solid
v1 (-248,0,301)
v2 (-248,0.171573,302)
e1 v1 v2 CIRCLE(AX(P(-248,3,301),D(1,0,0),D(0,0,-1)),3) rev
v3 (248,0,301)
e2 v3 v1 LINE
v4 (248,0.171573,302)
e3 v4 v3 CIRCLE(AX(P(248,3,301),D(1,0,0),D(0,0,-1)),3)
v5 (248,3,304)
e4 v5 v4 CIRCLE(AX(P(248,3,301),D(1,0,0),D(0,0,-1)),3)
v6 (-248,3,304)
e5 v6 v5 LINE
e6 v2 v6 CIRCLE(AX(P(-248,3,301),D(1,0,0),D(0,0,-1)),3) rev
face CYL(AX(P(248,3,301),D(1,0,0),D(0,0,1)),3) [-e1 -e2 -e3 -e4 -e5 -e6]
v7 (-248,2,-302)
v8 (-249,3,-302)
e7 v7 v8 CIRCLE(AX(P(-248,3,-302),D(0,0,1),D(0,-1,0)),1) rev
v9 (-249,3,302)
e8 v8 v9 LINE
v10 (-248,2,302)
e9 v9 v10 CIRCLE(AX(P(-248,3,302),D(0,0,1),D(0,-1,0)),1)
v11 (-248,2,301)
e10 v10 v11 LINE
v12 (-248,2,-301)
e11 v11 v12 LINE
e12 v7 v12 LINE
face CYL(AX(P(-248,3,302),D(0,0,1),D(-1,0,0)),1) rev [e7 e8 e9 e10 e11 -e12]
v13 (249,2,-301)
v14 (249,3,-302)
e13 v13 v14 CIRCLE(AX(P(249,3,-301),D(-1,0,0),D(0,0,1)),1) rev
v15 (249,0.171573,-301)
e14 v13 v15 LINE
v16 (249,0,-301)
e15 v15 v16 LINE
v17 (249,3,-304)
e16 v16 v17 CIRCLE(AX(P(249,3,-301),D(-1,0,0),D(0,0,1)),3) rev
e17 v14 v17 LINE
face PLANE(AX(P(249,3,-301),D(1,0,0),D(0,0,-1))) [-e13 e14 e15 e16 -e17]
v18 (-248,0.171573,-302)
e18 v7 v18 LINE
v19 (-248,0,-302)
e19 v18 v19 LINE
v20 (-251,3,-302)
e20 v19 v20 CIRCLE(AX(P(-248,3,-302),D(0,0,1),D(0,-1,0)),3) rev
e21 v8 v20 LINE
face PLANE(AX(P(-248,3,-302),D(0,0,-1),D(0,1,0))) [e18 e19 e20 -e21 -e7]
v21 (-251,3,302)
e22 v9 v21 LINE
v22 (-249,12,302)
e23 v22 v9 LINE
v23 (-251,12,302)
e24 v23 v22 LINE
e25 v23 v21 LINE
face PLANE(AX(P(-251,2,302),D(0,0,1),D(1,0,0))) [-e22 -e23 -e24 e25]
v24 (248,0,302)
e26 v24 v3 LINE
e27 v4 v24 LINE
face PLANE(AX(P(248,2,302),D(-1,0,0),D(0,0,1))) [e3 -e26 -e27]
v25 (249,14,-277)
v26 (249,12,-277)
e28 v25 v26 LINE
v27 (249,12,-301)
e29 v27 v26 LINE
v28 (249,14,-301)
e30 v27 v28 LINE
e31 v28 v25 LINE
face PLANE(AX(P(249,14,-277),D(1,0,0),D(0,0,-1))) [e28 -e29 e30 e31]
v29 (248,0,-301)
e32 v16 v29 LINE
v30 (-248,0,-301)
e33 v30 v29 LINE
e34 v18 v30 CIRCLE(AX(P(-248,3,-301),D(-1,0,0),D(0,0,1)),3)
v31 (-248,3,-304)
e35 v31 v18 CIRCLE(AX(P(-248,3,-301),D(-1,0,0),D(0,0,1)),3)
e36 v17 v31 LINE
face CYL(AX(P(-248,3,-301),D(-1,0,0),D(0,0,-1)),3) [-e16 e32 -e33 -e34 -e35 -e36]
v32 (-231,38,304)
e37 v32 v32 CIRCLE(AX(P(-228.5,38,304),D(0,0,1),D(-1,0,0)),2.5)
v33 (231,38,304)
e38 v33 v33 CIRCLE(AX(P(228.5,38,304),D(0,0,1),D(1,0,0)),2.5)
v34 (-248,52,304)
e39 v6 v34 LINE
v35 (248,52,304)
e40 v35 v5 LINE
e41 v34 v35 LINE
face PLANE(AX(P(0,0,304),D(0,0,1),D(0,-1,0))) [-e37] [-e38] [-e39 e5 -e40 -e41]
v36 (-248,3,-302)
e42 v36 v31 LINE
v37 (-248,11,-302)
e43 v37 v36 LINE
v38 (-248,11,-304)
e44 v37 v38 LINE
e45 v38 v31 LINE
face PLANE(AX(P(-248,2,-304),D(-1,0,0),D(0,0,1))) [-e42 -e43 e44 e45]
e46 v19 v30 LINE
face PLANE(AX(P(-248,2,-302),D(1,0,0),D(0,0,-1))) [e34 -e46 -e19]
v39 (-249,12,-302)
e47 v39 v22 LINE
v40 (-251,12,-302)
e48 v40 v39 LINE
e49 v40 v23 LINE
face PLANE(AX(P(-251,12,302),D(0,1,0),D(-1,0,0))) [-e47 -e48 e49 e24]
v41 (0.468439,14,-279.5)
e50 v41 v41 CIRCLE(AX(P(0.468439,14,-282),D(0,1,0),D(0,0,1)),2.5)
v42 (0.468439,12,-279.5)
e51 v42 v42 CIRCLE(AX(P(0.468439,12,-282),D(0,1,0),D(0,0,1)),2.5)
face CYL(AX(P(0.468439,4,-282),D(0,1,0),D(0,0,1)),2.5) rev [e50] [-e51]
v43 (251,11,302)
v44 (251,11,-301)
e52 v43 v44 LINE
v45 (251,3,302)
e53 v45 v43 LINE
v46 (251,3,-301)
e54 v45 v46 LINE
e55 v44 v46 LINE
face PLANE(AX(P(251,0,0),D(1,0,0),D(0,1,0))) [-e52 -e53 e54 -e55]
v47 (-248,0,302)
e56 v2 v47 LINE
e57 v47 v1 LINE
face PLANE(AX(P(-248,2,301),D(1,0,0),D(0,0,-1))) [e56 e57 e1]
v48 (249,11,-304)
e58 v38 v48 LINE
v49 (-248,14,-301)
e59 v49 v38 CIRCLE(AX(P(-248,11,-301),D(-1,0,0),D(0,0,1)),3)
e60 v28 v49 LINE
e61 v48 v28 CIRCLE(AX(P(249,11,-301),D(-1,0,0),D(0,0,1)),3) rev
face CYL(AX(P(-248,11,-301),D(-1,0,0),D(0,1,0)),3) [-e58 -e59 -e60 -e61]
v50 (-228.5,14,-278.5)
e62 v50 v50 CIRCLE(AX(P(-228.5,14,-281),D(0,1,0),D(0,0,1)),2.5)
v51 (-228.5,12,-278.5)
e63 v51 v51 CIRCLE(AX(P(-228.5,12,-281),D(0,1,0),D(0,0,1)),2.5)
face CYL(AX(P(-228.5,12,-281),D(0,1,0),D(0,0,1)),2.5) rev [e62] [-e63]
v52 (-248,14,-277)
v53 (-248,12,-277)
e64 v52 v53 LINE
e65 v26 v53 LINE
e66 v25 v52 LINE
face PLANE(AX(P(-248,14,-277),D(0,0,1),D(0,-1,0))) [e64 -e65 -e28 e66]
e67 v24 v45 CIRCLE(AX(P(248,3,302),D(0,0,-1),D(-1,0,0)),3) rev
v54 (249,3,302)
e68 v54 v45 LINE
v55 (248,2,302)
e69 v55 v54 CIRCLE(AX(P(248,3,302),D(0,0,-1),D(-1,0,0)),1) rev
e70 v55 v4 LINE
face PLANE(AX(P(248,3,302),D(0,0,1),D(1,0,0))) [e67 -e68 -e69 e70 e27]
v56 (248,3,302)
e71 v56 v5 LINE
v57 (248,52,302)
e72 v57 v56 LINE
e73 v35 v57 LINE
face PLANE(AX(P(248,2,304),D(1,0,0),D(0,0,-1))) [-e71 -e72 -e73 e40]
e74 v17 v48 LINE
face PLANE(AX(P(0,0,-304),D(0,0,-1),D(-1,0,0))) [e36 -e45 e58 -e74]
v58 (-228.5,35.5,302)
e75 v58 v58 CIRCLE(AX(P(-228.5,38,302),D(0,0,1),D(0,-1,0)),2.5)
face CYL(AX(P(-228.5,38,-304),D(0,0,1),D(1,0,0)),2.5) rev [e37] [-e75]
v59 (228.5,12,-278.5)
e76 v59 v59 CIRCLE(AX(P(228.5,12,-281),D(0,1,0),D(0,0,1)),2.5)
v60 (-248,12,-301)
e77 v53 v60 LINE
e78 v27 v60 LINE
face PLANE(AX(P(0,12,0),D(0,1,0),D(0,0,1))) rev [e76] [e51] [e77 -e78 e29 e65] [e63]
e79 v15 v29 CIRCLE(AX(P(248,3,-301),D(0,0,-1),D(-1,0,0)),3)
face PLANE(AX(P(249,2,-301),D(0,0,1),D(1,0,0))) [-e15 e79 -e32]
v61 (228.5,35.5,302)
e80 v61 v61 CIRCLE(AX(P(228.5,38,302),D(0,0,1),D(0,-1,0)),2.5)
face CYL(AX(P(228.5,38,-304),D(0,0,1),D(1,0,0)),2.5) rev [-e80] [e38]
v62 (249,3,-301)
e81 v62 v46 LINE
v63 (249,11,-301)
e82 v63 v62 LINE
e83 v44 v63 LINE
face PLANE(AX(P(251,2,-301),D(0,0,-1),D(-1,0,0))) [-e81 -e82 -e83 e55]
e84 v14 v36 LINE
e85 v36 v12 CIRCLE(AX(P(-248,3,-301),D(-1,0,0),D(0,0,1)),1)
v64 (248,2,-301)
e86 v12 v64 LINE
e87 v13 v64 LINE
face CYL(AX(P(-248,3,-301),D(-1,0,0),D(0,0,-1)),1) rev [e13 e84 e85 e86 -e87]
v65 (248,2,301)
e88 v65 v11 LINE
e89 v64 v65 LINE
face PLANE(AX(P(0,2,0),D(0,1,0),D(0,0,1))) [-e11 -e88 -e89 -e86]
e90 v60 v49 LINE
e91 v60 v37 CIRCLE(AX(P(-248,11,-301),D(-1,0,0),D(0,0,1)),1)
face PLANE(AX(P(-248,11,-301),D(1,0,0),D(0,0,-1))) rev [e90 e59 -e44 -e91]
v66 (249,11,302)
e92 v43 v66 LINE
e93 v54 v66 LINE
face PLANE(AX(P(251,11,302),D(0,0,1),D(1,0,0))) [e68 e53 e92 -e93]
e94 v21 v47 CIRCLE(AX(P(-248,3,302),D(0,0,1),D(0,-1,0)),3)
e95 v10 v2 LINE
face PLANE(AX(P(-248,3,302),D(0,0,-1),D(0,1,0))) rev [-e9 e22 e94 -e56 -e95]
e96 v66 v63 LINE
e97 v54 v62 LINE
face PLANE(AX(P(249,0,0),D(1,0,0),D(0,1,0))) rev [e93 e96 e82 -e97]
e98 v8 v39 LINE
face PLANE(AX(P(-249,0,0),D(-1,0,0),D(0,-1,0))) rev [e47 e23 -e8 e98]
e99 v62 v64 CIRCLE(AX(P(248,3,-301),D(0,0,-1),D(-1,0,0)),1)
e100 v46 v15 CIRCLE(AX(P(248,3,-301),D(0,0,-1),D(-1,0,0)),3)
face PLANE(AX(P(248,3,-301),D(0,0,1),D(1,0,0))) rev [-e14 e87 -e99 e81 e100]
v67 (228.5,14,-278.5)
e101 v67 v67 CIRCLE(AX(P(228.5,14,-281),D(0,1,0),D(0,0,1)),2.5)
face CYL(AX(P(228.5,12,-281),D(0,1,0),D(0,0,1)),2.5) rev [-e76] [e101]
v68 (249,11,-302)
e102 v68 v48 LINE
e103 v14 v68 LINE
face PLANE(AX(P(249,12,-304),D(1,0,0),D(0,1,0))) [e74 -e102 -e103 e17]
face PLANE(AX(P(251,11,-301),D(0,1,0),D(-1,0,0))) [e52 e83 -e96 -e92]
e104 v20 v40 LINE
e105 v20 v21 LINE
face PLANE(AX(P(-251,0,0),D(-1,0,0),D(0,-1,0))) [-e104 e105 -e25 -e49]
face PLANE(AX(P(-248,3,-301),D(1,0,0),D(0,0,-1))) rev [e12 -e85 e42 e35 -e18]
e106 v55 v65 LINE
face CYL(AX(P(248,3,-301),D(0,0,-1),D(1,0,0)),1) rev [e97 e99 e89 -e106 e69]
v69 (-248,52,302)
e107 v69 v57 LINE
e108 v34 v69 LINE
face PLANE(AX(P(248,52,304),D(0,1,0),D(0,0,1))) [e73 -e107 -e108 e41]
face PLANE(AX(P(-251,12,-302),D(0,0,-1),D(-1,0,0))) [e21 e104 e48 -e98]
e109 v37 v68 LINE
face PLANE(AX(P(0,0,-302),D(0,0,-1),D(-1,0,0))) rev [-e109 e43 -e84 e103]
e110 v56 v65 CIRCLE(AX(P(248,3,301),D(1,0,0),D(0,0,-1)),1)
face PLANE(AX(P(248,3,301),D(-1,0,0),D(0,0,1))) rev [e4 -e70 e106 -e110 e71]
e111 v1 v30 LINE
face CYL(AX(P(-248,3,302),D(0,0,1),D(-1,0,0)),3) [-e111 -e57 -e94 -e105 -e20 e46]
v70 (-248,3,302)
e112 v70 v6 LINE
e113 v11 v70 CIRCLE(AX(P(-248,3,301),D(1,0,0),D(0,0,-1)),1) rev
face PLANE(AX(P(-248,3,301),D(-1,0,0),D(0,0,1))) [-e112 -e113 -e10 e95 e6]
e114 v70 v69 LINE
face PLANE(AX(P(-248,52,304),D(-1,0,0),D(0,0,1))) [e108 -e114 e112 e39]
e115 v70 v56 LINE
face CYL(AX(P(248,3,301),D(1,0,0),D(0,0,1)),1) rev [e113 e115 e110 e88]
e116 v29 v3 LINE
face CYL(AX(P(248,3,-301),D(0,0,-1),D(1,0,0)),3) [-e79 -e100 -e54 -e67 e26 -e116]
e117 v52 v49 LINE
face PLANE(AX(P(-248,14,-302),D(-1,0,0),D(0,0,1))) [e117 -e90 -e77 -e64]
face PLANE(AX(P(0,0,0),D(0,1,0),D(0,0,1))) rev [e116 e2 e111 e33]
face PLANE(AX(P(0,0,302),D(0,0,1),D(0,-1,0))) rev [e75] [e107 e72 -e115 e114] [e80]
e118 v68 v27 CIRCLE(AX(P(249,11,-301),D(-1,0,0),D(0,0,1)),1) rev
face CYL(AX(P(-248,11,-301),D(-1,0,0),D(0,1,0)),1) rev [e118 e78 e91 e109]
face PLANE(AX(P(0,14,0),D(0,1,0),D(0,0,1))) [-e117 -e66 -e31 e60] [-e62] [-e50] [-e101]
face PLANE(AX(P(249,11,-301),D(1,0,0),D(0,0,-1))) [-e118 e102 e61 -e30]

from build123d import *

# Parameters (mm, degrees)
SKETCH1_W                    = 498
SKETCH1_H                    = 604
BASE_FLANGE1_DEPTH           = 2
EDGE_FLANGE1_STRIP_W         = 10
EDGE_FLANGE1_STRIP_H         = 2
EDGE_FLANGE1_STRIP_CUT_DEPTH = 604
EDGE_FLANGE1_DEPTH           = 604
EDGE_FLANGE4_STRIP_W         = 10
EDGE_FLANGE4_STRIP_H         = 2
EDGE_FLANGE4_STRIP_CUT_DEPTH = 497
EDGE_FLANGE4_DEPTH           = 497
EDGE_FLANGE5_STRIP_W         = 10
EDGE_FLANGE5_STRIP_H         = 2
EDGE_FLANGE5_STRIP_CUT_DEPTH = 497
EDGE_FLANGE5_DEPTH           = 497
EDGE_FLANGE6_STRIP_W         = 10
EDGE_FLANGE6_STRIP_H         = 2
EDGE_FLANGE6_STRIP_CUT_DEPTH = 603
EDGE_FLANGE6_DEPTH           = 603
EDGE_FLANGE7_STRIP_W         = 10
EDGE_FLANGE7_STRIP_H         = 2
EDGE_FLANGE7_STRIP_CUT_DEPTH = 496
EDGE_FLANGE7_DEPTH           = 496
SKETCH37_R                   = 2.5
CUT_EXTRUDE2_DEPTH           = 2
SKETCH38_R                   = 2.5
CUT_EXTRUDE3_DEPTH           = 660.824976793
SKETCH39_R                   = 2.5
CUT_EXTRUDE4_DEPTH           = 10


# Sheet-metal steps are written as plain solids
with BuildPart() as part:
    # Sketch1 → Base-Flange1 (new body)
    with BuildSketch(Plane(origin=(0, 0, 0), x_dir=(1, 0, 0), z_dir=(0, 1, 0))):
        Rectangle(SKETCH1_W, SKETCH1_H)
    extrude(amount=BASE_FLANGE1_DEPTH)

    # Edge-Flange1 strip (across the edge) → Edge-Flange1 strip cut (cut)
    with BuildSketch(Plane(origin=(-249, 2, -302), x_dir=(1, 0, 0), z_dir=(0, 0, 1))):
        with Locations((-4, -1)):
            Rectangle(EDGE_FLANGE1_STRIP_W, EDGE_FLANGE1_STRIP_H)
    extrude(amount=EDGE_FLANGE1_STRIP_CUT_DEPTH, mode=Mode.SUBTRACT)

    # Edge-Flange1 section (across the edge) → Edge-Flange1 (add)
    with BuildSketch(Plane(origin=(-249, 2, -302), x_dir=(1, 0, 0), z_dir=(0, 0, 1))):
        with BuildLine():
            Line((-2, 1), (-2, 10))
            Line((-2, 10), (0, 10))
            Line((0, 10), (0, 1))
            ThreePointArc((0, 1), (0.292893219, 0.292893219), (1, 0))
            Line((1, 0), (1, -2))
            ThreePointArc((1, -2), (-1.121320344, -1.121320344), (-2, 1))
        make_face()
    extrude(amount=EDGE_FLANGE1_DEPTH)

    # Edge-Flange4 strip (across the edge) → Edge-Flange4 strip cut (cut)
    with BuildSketch(Plane(origin=(249, 2, -302), x_dir=(0, 0, 1), z_dir=(-1, 0, 0))):
        with Locations((-4, -1)):
            Rectangle(EDGE_FLANGE4_STRIP_W, EDGE_FLANGE4_STRIP_H)
    extrude(amount=EDGE_FLANGE4_STRIP_CUT_DEPTH, mode=Mode.SUBTRACT)

    # Edge-Flange4 section (across the edge) → Edge-Flange4 (add)
    with BuildSketch(Plane(origin=(249, 2, -302), x_dir=(0, 0, 1), z_dir=(-1, 0, 0))):
        with BuildLine():
            Line((-2, 1), (-2, 10))
            Line((-2, 10), (0, 10))
            Line((0, 10), (0, 1))
            ThreePointArc((0, 1), (0.292893219, 0.292893219), (1, 0))
            Line((1, 0), (1, -2))
            ThreePointArc((1, -2), (-1.121320344, -1.121320344), (-2, 1))
        make_face()
    extrude(amount=EDGE_FLANGE4_DEPTH)

    # Edge-Flange5 strip (across the edge) → Edge-Flange5 strip cut (cut)
    with BuildSketch(Plane(origin=(249, 12, -302), x_dir=(0, -1, 0), z_dir=(-1, 0, 0))):
        with Locations((-4, -1)):
            Rectangle(EDGE_FLANGE5_STRIP_W, EDGE_FLANGE5_STRIP_H)
    extrude(amount=EDGE_FLANGE5_STRIP_CUT_DEPTH, mode=Mode.SUBTRACT)

    # Edge-Flange5 section (across the edge) → Edge-Flange5 (add)
    with BuildSketch(Plane(origin=(249, 12, -302), x_dir=(0, -1, 0), z_dir=(-1, 0, 0))):
        with BuildLine():
            Line((-2, 1), (-2, 25))
            Line((-2, 25), (0, 25))
            Line((0, 25), (0, 1))
            ThreePointArc((0, 1), (0.292893219, 0.292893219), (1, 0))
            Line((1, 0), (1, -2))
            ThreePointArc((1, -2), (-1.121320344, -1.121320344), (-2, 1))
        make_face()
    extrude(amount=EDGE_FLANGE5_DEPTH)

    # Edge-Flange6 strip (across the edge) → Edge-Flange6 strip cut (cut)
    with BuildSketch(Plane(origin=(249, 2, 302), x_dir=(-1, 0, 0), z_dir=(0, 0, -1))):
        with Locations((-4, -1)):
            Rectangle(EDGE_FLANGE6_STRIP_W, EDGE_FLANGE6_STRIP_H)
    extrude(amount=EDGE_FLANGE6_STRIP_CUT_DEPTH, mode=Mode.SUBTRACT)

    # Edge-Flange6 section (across the edge) → Edge-Flange6 (add)
    with BuildSketch(Plane(origin=(249, 2, 302), x_dir=(-1, 0, 0), z_dir=(0, 0, -1))):
        with BuildLine():
            Line((-2, 1), (-2, 9))
            Line((-2, 9), (0, 9))
            Line((0, 9), (0, 1))
            ThreePointArc((0, 1), (0.292893219, 0.292893219), (1, 0))
            Line((1, 0), (1, -2))
            ThreePointArc((1, -2), (-1.121320344, -1.121320344), (-2, 1))
        make_face()
    extrude(amount=EDGE_FLANGE6_DEPTH)

    # Edge-Flange7 strip (across the edge) → Edge-Flange7 strip cut (cut)
    with BuildSketch(Plane(origin=(-248, 2, 302), x_dir=(0, 0, -1), z_dir=(1, 0, 0))):
        with Locations((-4, -1)):
            Rectangle(EDGE_FLANGE7_STRIP_W, EDGE_FLANGE7_STRIP_H)
    extrude(amount=EDGE_FLANGE7_STRIP_CUT_DEPTH, mode=Mode.SUBTRACT)

    # Edge-Flange7 section (across the edge) → Edge-Flange7 (add)
    with BuildSketch(Plane(origin=(-248, 2, 302), x_dir=(0, 0, -1), z_dir=(1, 0, 0))):
        with BuildLine():
            Line((-2, 1), (-2, 50))
            Line((-2, 50), (0, 50))
            Line((0, 50), (0, 1))
            ThreePointArc((0, 1), (0.292893219, 0.292893219), (1, 0))
            Line((1, 0), (1, -2))
            ThreePointArc((1, -2), (-1.121320344, -1.121320344), (-2, 1))
        make_face()
    extrude(amount=EDGE_FLANGE7_DEPTH)

    # Sketch37 → Cut-Extrude2 (cut)
    with BuildSketch(Plane(origin=(0, 14, 0), x_dir=(1, 0, 0), z_dir=(0, 1, 0))):
        with Locations(Location((-228.5, 281, 0), (0, 0, 270))):
            Circle(SKETCH37_R)
        with Locations(Location((228.5, 281, 0), (0, 0, 270))):
            Circle(SKETCH37_R)
    extrude(amount=-CUT_EXTRUDE2_DEPTH, mode=Mode.SUBTRACT)

    # Sketch38 → Cut-Extrude3 (cut, through all)
    with BuildSketch(Plane.XY.offset(304)):
        with Locations((228.5, 38)):
            Circle(SKETCH38_R)
        with Locations(Location((-228.5, 38, 0), (0, 0, 270))):
            Circle(SKETCH38_R)
    extrude(amount=-CUT_EXTRUDE3_DEPTH, mode=Mode.SUBTRACT)

    # Sketch39 → Cut-Extrude4 (cut)
    with BuildSketch(Plane(origin=(0, 14, 0), x_dir=(1, 0, 0), z_dir=(0, 1, 0))):
        with Locations(Location((0.468438538, 282, 0), (0, 0, 270))):
            Circle(SKETCH39_R)
    extrude(amount=-CUT_EXTRUDE4_DEPTH, mode=Mode.SUBTRACT)


solid = part.part
